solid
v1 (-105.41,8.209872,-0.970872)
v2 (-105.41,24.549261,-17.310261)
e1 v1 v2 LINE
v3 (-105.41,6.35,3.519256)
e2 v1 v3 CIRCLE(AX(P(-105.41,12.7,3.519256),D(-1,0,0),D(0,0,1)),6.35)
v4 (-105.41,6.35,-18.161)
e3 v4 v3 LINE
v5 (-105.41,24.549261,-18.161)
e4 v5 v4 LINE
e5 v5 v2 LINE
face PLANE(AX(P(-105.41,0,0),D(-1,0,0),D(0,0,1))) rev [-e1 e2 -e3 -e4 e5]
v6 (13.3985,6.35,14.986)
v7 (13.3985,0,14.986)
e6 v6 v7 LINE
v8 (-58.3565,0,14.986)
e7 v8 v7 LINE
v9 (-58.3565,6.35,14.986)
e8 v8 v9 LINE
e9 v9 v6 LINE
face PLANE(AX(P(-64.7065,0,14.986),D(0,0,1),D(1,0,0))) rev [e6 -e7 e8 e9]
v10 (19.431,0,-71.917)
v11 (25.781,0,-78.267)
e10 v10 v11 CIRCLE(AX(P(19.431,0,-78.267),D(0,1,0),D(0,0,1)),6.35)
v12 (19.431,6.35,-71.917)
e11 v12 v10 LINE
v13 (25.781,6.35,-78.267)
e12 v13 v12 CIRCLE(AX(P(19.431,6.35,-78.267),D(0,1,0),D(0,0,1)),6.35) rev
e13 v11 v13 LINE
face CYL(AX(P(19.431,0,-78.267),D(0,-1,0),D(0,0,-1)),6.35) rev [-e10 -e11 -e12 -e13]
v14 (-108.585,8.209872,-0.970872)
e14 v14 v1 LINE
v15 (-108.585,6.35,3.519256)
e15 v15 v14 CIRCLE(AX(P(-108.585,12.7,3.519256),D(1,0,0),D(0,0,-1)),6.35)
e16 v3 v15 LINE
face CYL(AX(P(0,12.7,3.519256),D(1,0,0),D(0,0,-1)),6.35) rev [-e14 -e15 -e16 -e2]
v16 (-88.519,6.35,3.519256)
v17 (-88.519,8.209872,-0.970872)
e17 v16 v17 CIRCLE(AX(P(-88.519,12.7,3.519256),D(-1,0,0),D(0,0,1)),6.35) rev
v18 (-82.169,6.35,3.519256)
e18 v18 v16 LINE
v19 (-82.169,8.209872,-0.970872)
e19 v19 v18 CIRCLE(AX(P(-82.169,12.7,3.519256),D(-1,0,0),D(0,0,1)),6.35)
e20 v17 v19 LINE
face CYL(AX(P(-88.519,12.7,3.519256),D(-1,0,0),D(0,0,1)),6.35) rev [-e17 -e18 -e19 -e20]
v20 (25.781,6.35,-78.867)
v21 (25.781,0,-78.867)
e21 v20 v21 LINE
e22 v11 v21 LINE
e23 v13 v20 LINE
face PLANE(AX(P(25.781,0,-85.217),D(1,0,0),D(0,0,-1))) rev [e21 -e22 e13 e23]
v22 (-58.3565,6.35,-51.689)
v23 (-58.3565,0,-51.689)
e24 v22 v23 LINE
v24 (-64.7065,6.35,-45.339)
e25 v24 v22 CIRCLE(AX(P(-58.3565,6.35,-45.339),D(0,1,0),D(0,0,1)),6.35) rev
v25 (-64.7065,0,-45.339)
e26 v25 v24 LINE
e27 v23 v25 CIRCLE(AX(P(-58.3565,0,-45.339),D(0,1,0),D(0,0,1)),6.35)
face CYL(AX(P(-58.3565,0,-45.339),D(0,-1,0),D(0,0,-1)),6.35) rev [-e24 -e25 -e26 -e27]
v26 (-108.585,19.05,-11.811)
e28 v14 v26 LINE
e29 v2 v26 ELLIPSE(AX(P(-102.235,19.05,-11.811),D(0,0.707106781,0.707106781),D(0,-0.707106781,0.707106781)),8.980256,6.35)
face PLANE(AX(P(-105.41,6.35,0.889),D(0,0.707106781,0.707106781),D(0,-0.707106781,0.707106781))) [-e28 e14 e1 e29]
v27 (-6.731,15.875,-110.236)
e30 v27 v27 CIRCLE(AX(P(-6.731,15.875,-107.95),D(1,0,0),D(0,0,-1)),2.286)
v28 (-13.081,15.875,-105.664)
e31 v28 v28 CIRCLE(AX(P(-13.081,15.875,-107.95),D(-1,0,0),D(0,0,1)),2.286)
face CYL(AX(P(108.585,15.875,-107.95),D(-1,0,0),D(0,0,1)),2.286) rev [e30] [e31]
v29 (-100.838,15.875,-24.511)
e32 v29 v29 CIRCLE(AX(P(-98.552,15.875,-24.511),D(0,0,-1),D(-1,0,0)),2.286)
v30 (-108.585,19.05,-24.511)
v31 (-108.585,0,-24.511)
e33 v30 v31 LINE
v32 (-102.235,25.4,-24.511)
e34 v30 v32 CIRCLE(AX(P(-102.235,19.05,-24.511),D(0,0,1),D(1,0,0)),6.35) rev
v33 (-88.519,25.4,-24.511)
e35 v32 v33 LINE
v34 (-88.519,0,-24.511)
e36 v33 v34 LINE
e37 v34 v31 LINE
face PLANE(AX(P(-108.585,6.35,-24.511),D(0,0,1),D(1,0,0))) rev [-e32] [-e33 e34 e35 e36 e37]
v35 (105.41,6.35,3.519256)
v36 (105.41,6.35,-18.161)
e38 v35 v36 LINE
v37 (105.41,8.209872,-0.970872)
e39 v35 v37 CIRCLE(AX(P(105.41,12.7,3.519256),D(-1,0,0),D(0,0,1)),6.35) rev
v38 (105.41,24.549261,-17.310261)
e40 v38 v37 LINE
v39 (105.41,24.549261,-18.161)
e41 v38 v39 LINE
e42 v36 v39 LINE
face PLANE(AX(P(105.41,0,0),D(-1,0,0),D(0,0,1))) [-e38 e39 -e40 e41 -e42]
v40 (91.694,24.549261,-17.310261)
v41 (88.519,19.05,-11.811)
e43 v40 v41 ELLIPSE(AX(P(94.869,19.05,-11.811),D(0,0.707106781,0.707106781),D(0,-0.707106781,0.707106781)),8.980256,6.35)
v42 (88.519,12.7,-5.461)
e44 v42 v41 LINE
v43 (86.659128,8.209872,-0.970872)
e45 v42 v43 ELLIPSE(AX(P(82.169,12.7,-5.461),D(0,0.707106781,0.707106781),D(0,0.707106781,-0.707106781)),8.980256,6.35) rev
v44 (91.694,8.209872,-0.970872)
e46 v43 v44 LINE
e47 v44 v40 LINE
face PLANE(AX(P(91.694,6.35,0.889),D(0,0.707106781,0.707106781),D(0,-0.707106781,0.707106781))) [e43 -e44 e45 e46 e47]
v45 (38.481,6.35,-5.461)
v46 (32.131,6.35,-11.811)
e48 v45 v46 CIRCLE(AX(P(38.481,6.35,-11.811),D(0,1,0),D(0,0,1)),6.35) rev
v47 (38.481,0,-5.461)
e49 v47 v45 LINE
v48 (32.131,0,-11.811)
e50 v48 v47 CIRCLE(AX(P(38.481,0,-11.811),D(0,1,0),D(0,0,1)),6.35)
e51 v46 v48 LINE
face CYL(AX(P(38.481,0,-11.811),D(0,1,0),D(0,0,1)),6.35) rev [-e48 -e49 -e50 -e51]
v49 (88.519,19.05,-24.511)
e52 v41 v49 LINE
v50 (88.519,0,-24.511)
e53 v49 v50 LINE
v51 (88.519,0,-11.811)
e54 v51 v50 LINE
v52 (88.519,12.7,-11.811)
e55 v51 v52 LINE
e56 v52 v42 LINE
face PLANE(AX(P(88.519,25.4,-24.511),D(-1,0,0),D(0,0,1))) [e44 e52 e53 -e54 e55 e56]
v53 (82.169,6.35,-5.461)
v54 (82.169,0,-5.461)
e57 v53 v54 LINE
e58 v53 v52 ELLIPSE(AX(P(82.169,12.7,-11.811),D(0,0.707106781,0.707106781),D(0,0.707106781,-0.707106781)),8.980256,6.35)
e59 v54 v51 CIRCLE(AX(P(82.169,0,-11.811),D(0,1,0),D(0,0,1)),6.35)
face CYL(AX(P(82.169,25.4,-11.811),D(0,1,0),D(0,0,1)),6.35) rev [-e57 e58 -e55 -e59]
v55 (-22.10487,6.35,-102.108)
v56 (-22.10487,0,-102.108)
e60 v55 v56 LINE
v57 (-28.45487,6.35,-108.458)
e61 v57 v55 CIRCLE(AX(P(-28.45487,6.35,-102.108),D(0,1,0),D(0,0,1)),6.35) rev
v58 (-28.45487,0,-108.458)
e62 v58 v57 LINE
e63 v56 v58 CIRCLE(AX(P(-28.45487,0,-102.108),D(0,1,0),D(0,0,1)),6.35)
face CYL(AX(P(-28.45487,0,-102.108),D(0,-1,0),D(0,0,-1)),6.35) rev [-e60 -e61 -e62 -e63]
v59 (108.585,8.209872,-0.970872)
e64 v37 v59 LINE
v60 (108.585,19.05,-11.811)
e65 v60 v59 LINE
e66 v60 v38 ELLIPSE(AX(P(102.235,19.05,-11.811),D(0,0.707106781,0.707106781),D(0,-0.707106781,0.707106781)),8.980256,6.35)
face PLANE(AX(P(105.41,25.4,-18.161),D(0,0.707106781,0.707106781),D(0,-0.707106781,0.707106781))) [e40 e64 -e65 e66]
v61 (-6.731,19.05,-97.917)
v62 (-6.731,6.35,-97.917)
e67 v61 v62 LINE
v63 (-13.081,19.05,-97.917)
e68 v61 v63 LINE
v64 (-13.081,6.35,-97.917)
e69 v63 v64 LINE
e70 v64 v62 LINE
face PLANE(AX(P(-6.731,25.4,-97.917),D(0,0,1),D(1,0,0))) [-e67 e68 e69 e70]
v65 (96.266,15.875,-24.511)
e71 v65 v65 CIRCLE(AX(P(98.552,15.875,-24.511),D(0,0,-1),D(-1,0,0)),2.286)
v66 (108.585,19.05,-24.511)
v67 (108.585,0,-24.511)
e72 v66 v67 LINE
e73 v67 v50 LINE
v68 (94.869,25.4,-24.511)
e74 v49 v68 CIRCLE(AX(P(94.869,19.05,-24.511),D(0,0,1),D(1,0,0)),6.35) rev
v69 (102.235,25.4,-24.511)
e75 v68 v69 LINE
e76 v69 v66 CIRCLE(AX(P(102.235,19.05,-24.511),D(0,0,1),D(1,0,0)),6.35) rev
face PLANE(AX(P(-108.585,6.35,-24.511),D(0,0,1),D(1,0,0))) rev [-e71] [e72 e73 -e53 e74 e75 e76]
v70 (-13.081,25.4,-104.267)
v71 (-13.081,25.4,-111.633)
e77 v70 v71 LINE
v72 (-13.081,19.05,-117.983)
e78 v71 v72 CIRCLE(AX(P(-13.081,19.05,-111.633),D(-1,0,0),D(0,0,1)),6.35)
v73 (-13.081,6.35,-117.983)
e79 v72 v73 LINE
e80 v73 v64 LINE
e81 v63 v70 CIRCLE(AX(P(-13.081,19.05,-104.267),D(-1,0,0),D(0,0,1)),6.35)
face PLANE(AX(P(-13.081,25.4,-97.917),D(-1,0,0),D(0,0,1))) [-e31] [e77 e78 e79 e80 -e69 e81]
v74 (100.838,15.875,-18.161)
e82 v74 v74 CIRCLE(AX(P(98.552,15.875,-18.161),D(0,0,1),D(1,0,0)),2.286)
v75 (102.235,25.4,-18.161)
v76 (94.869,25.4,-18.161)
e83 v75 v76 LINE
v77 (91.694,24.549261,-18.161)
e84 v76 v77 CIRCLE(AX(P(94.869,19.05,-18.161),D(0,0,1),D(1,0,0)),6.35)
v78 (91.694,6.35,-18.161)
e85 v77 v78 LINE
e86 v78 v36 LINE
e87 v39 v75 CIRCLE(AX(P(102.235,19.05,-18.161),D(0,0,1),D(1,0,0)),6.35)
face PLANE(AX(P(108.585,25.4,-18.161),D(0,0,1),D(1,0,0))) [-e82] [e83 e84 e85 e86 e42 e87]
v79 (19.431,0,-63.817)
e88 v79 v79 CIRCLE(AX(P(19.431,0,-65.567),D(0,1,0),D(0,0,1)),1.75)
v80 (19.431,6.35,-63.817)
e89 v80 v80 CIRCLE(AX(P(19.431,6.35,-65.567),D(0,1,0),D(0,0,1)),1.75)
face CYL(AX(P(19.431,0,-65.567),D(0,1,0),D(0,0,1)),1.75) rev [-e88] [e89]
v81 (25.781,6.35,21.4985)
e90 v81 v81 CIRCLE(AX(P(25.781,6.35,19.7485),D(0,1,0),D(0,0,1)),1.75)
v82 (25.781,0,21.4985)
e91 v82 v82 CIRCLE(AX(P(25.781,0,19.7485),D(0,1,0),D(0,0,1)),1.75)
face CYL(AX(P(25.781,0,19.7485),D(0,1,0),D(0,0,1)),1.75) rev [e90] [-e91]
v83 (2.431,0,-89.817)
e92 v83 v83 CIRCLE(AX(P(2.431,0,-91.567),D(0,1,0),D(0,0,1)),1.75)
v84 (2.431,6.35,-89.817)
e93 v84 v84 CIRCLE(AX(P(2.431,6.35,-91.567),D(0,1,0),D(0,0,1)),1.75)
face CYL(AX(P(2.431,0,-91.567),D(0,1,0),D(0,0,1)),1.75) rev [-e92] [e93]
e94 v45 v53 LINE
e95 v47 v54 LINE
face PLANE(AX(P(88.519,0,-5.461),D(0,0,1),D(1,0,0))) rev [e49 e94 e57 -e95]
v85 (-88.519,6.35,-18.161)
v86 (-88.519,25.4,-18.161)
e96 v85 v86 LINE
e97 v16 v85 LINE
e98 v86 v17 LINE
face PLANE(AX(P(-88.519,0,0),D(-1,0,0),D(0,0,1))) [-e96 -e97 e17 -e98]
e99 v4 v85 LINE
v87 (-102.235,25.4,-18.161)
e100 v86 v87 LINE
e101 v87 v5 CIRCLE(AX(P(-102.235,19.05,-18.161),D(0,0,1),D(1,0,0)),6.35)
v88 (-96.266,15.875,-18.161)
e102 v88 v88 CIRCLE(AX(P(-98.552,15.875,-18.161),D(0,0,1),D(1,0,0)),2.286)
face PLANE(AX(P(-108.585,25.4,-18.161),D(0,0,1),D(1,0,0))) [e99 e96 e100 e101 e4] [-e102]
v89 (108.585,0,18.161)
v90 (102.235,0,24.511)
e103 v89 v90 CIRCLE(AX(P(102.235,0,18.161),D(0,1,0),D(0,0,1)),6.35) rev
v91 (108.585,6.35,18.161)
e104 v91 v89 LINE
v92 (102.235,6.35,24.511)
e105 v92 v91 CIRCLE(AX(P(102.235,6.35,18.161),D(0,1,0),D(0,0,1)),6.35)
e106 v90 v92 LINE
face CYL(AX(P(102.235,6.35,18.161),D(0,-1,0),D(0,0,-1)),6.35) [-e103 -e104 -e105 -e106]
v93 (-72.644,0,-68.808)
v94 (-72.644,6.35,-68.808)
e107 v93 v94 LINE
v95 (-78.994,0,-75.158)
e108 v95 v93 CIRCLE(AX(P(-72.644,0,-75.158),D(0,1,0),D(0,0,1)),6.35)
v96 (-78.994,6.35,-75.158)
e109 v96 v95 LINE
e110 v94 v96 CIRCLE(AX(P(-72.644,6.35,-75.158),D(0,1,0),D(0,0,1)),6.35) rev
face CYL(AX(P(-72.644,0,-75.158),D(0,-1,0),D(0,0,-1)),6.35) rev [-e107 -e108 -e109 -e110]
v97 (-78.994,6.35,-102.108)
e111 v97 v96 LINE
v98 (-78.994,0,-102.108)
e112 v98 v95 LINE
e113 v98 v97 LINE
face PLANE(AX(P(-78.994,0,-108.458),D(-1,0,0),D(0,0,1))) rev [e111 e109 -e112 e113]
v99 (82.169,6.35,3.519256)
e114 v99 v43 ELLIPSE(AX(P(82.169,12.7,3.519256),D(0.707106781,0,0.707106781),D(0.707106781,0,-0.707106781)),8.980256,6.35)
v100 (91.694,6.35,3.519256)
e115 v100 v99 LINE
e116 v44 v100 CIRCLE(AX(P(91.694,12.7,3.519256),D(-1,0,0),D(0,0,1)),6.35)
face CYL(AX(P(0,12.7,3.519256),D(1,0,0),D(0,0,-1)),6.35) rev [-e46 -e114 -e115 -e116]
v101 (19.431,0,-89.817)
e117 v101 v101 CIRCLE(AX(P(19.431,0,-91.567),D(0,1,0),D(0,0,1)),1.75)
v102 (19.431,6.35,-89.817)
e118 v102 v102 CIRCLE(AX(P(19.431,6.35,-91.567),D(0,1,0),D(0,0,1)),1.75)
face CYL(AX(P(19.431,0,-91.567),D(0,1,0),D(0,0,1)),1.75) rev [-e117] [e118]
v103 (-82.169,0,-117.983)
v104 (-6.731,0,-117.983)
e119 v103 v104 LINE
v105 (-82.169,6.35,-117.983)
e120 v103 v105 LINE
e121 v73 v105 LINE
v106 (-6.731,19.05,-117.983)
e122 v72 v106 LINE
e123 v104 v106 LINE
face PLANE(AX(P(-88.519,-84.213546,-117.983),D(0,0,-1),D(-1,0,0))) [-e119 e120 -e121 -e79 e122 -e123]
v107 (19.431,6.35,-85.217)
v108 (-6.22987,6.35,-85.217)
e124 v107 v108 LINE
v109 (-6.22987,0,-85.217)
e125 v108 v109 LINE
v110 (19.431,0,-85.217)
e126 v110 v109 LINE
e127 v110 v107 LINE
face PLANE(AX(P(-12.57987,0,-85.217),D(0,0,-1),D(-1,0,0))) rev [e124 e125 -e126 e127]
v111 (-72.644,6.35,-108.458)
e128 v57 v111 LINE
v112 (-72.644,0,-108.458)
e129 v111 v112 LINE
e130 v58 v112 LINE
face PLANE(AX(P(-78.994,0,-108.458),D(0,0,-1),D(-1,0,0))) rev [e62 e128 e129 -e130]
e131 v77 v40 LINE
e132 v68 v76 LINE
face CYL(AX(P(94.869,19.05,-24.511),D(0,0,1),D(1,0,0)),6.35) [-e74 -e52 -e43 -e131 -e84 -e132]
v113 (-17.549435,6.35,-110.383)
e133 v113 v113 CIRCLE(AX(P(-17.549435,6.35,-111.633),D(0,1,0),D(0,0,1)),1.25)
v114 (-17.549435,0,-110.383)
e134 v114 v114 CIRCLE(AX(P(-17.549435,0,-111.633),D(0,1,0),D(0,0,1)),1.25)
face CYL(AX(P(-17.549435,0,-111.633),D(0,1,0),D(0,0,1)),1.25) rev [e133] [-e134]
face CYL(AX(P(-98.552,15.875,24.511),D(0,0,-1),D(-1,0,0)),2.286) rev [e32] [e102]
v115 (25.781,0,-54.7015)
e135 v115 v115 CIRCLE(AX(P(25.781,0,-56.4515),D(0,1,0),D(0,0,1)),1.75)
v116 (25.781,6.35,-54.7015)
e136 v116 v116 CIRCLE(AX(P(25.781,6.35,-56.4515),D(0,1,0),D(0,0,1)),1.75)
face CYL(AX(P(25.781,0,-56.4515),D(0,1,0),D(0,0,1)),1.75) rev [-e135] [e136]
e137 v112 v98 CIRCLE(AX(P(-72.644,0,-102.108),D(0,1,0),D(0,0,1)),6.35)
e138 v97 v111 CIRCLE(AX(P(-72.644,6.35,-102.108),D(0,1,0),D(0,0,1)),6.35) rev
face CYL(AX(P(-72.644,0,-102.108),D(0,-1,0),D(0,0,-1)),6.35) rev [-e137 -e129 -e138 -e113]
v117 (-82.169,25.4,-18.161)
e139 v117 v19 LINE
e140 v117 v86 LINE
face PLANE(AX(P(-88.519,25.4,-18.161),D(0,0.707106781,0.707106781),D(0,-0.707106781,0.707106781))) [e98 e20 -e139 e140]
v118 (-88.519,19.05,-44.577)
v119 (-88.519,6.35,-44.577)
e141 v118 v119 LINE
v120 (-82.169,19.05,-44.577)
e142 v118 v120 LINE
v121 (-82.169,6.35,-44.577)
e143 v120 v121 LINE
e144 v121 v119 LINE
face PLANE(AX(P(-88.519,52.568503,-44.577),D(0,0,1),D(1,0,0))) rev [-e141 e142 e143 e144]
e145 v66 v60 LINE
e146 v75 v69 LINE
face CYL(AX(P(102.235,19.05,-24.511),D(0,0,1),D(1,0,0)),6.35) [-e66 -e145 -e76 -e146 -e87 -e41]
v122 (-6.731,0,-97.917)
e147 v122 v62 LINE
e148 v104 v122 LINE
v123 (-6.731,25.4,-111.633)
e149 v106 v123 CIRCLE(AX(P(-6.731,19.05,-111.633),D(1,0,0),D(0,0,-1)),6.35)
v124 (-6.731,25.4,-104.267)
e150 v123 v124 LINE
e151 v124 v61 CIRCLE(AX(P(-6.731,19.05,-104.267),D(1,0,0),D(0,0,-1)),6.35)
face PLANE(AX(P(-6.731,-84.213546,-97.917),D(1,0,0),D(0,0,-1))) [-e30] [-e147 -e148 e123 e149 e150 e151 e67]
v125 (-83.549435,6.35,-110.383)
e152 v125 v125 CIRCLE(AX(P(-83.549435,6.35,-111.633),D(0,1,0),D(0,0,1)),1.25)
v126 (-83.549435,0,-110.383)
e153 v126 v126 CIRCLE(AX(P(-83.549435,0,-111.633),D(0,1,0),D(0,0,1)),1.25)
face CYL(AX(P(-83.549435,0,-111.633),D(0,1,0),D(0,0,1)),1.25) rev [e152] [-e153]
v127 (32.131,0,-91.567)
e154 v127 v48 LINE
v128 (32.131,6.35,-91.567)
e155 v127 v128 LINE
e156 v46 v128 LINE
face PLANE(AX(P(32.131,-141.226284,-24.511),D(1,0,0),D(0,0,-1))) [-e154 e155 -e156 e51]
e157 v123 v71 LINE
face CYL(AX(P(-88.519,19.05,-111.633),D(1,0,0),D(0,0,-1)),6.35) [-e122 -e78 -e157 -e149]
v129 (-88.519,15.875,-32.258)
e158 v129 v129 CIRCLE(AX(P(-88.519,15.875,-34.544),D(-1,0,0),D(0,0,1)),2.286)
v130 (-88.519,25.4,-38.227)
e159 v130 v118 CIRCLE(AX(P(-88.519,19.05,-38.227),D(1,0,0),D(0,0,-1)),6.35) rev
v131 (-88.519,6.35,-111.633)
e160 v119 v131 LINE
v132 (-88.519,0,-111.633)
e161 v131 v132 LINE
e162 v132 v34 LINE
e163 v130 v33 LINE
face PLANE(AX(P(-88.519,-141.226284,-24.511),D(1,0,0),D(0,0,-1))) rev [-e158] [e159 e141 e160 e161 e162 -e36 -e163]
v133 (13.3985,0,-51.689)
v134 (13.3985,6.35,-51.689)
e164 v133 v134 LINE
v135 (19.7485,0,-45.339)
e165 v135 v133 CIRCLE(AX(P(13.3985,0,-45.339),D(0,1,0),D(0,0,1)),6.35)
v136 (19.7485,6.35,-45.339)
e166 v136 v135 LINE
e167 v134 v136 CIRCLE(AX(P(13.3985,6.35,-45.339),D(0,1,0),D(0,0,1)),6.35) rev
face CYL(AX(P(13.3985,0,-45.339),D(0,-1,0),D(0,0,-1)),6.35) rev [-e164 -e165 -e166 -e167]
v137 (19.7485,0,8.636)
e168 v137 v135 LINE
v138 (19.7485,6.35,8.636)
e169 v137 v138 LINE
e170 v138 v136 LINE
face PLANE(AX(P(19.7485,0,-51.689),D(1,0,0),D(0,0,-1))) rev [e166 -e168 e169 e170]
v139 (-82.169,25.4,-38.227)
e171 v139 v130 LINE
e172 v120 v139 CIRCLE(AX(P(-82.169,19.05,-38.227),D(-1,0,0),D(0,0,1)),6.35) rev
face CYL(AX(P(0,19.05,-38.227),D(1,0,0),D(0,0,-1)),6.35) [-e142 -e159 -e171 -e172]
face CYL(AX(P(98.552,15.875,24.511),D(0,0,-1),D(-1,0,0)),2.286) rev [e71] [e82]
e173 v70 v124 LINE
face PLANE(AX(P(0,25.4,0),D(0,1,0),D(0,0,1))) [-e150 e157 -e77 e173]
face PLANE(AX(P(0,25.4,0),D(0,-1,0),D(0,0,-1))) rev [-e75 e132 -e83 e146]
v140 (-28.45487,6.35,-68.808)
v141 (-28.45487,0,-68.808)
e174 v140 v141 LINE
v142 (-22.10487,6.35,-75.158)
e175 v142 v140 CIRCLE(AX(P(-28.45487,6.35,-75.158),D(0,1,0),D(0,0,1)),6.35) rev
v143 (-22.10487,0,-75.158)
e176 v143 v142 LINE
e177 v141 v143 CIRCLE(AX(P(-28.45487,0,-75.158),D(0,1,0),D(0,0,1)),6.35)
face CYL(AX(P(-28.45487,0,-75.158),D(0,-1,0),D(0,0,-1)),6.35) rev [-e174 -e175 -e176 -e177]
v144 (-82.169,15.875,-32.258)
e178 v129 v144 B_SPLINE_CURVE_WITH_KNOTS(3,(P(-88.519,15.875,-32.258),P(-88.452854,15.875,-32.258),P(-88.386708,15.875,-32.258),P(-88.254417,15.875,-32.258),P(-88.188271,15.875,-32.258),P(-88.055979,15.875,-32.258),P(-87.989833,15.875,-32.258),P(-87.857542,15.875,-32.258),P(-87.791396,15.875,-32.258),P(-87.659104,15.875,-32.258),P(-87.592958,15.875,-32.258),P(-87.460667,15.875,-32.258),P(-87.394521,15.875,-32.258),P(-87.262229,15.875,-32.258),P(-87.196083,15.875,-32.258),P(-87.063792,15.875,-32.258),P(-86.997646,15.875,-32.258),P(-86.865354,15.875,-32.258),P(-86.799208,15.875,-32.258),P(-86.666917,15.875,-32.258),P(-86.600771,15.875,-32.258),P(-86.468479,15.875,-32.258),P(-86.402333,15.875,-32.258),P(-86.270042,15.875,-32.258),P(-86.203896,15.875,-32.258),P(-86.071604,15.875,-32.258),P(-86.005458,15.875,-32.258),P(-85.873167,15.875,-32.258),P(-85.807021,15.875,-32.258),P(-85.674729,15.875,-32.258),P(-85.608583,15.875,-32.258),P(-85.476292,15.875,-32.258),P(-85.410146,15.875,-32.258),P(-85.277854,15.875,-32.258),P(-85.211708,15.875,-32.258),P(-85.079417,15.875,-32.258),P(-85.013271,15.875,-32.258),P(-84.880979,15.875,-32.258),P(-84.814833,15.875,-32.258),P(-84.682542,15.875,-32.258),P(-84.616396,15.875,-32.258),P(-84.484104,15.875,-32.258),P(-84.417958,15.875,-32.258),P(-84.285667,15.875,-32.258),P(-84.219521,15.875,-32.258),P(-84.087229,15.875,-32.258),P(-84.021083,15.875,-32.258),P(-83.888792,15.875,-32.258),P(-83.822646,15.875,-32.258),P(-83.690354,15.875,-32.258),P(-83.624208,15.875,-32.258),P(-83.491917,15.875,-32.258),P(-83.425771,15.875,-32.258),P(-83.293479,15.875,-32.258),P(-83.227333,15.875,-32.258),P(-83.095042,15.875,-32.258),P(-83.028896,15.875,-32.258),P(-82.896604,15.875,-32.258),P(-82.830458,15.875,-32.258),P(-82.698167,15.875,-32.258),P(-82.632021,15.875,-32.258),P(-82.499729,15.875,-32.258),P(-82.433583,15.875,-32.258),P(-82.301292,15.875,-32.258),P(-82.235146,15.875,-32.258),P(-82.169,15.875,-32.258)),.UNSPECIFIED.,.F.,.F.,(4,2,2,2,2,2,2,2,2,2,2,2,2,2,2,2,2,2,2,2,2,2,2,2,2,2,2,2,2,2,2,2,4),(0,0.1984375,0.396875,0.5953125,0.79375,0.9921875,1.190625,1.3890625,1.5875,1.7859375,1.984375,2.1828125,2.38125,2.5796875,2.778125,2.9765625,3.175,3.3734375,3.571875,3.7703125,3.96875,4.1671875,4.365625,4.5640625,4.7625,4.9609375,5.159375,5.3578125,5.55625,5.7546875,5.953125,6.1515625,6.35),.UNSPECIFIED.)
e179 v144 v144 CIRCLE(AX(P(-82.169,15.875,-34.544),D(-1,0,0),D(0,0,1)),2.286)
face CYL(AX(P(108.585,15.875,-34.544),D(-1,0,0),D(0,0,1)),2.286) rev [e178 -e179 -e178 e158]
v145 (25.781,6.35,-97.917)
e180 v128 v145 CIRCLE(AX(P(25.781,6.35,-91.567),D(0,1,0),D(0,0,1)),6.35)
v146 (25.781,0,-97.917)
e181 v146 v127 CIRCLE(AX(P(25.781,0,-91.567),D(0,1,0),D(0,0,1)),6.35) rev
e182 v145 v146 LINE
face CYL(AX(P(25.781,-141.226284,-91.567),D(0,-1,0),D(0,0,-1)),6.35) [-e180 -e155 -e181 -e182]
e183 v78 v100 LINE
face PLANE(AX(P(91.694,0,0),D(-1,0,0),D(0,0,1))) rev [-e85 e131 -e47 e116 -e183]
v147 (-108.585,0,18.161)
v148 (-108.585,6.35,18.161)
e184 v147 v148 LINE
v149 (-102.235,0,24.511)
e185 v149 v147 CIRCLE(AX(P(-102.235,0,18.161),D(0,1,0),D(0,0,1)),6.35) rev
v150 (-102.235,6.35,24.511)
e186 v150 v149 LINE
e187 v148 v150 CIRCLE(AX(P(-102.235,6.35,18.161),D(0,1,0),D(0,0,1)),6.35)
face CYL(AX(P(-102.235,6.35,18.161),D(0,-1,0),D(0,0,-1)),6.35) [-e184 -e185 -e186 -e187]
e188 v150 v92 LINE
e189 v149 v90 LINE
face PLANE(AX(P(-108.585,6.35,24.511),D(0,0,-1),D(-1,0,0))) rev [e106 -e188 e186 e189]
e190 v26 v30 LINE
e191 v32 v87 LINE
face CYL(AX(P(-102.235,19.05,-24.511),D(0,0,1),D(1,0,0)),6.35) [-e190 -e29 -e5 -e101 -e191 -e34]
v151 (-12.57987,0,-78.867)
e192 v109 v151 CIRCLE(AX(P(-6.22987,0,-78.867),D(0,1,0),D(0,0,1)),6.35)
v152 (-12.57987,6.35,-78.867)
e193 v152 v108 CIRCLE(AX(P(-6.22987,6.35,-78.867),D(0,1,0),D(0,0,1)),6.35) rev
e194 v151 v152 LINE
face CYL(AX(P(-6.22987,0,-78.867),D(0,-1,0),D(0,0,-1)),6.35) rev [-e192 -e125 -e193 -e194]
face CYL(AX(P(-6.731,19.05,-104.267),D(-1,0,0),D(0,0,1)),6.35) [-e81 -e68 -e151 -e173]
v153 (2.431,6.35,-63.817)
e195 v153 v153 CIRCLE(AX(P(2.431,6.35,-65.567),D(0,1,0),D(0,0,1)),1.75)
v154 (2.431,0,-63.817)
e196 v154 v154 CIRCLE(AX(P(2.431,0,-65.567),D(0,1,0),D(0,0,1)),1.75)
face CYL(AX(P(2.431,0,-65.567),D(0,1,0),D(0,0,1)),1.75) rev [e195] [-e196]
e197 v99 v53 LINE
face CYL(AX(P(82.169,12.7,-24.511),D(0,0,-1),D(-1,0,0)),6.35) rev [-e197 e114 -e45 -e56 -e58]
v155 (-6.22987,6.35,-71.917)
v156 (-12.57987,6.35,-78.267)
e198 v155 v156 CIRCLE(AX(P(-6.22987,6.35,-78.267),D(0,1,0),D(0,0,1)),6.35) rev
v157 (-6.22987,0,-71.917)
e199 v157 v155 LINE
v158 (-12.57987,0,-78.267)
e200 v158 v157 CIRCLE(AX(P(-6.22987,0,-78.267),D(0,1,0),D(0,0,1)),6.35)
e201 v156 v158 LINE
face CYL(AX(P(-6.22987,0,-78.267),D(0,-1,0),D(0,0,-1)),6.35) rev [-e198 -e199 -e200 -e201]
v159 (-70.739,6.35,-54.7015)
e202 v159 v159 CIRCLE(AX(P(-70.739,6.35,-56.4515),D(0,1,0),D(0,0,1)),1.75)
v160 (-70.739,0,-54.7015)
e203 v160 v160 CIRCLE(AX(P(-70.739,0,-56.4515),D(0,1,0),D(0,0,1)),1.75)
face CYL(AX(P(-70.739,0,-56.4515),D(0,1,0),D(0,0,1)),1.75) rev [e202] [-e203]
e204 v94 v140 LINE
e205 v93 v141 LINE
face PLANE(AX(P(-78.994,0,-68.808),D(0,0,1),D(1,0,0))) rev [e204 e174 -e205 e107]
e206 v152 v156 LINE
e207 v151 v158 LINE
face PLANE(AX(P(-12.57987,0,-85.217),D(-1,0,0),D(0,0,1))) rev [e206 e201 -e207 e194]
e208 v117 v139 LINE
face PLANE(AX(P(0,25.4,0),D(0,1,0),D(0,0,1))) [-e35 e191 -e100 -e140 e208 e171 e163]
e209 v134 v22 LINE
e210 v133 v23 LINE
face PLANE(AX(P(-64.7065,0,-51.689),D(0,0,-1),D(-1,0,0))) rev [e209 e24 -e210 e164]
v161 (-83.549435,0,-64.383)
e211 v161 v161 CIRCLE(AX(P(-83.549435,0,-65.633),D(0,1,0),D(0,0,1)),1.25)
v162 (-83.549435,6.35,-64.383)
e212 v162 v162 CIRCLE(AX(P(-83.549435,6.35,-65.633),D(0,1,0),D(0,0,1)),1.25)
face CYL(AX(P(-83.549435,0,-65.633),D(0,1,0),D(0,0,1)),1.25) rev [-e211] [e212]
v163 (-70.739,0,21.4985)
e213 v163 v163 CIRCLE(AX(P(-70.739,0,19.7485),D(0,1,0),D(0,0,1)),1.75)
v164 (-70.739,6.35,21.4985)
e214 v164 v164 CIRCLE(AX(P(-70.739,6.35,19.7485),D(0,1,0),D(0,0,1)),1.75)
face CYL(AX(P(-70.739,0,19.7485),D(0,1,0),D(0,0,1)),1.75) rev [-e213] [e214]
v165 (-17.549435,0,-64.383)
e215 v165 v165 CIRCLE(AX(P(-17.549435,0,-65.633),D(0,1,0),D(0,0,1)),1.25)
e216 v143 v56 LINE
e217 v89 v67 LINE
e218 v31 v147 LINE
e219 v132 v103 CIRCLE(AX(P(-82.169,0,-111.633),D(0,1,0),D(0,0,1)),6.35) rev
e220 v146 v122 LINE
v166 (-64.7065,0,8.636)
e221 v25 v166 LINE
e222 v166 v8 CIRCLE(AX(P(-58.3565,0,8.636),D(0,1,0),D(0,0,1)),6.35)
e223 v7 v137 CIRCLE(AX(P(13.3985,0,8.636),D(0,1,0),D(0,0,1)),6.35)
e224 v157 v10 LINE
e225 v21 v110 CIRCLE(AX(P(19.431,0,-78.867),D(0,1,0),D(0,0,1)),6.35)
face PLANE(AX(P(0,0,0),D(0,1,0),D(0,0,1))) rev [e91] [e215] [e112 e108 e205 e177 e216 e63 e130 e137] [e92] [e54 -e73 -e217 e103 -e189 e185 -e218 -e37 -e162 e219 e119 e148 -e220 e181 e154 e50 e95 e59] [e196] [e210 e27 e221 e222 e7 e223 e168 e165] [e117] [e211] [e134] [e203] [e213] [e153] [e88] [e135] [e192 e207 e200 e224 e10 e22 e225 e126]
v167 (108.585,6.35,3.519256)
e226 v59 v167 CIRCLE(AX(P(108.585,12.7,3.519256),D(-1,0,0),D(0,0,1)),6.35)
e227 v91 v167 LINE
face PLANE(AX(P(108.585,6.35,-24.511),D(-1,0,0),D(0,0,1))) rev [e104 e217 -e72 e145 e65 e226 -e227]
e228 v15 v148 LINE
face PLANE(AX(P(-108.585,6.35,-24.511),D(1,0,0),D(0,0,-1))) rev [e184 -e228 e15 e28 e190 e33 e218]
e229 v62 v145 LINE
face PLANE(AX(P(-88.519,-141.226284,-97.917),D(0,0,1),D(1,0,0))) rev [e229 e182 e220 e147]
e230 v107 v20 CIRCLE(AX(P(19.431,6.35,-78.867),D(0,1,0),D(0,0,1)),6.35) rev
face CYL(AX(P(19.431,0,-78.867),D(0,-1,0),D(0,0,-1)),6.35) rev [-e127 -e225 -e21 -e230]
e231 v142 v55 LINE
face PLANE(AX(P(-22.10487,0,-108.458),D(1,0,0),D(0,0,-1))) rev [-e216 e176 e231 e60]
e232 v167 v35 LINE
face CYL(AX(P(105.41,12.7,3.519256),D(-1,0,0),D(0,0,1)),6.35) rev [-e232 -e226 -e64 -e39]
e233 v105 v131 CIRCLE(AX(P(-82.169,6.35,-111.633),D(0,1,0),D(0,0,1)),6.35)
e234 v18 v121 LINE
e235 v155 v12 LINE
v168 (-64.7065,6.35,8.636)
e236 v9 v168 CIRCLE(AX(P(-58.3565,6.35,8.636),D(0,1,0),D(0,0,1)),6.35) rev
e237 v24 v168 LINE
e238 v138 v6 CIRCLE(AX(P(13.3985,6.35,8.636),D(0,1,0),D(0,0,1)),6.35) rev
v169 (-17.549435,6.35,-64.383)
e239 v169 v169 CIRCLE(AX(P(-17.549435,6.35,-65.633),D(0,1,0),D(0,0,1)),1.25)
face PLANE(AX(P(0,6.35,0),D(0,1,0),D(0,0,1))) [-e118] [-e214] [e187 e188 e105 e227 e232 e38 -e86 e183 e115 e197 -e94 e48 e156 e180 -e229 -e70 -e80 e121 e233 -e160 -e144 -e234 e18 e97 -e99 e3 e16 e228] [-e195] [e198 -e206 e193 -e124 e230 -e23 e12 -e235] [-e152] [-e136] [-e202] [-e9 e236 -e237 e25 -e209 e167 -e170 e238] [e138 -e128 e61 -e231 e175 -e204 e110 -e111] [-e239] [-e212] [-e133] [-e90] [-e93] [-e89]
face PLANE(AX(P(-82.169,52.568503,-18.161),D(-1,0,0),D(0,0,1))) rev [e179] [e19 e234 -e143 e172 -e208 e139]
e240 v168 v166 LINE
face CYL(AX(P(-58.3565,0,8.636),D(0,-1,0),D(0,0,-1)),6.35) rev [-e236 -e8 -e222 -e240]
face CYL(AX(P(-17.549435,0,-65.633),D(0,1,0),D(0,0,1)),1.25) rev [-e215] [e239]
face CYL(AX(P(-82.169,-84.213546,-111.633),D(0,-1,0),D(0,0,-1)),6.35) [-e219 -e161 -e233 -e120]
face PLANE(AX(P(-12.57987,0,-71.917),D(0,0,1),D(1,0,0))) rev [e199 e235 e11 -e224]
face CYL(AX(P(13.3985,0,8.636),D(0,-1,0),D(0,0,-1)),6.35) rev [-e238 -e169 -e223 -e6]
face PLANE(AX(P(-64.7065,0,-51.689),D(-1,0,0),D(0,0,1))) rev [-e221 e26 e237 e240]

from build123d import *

# Parameters (mm, degrees)
SKETCH2_W            = 217.17
SKETCH2_H            = 49.022
BOSS_EXTRUDE1_DEPTH  = 6.35
SKETCH3_W            = 20.066
SKETCH3_H            = 6.35
BOSS_EXTRUDE2_DEPTH  = 25.4
SKETCH5_W            = 120.65
SKETCH5_H            = 73.406
BOSS_EXTRUDE3_DEPTH  = 6.35
SKETCH6_W            = 6.35
SKETCH6_H            = 26.416
BOSS_EXTRUDE4_DEPTH  = 19.05
SKETCH7_R            = 2.286
CUT_EXTRUDE1_DEPTH   = 134.507689146
SKETCH8_R            = 2.286
CUT_EXTRUDE2_DEPTH   = 222.54657683
SKETCH9_W            = 56.388
SKETCH9_H            = 19.05
CUT_EXTRUDE3_DEPTH   = 148.44946122
SKETCH11_W           = 81.788
SKETCH11_H           = 20.066
BOSS_EXTRUDE5_DEPTH  = 6.35
SKETCH12_W           = 6.35
SKETCH12_H           = 20.066
BOSS_EXTRUDE6_DEPTH  = 25.4
SKETCH16_R           = 1.25
SKETCH16_R_2         = 1.75
SKETCH16_W           = 56.889130435
SKETCH16_H           = 39.65
SKETCH16_W_2         = 84.455
SKETCH16_H_2         = 66.675
SKETCH16_W_3         = 38.360869565
SKETCH16_H_3         = 13.3
CUT_EXTRUDE6_DEPTH   = 162.473195961
BOSS_EXTRUDE8_DEPTH  = 3.175
BOSS_EXTRUDE9_DEPTH  = 3.175
BOSS_EXTRUDE10_DEPTH = 3.175
BOSS_EXTRUDE11_DEPTH = 6.35
FILLET1_R            = 6.35
SKETCH21_R           = 2.286
CUT_EXTRUDE7_DEPTH   = 172.370253676
FILLET2_R            = 6.35


# Some blends are built 0.0001 mm under size
with BuildPart() as part:
    # Sketch2 → Boss-Extrude1 (new body)
    with BuildSketch(Plane(origin=(0, 0, 0), x_dir=(1, 0, 0), z_dir=(0, 1, 0))):
        Rectangle(SKETCH2_W, SKETCH2_H)
    extrude(amount=BOSS_EXTRUDE1_DEPTH)

    # Sketch3 → Boss-Extrude2 (add)
    with BuildSketch(Plane.XZ):
        with Locations((98.552, -21.336)):
            Rectangle(SKETCH3_W, SKETCH3_H)
        with Locations((-98.552, -21.336)):
            Rectangle(SKETCH3_W, SKETCH3_H)
    extrude(amount=-BOSS_EXTRUDE2_DEPTH)

    # Sketch5 → Boss-Extrude3 (add)
    with BuildSketch(Plane(origin=(0, 6.35, 0), x_dir=(1, 0, 0), z_dir=(0, 1, 0))):
        with Locations((-28.194, 61.214)):
            Rectangle(SKETCH5_W, SKETCH5_H)
    extrude(amount=-BOSS_EXTRUDE3_DEPTH)

    # Sketch6 → Boss-Extrude4 (add)
    with BuildSketch(Plane(origin=(0, 6.35, 0), x_dir=(1, 0, 0), z_dir=(0, 1, 0))):
        with Locations((-85.344, 31.369)):
            Rectangle(SKETCH6_W, SKETCH6_H)
    extrude(amount=BOSS_EXTRUDE4_DEPTH)

    # Sketch7 → Cut-Extrude1 (cut, through all)
    with BuildSketch(Plane(origin=(0, 0, -24.511), x_dir=(-1, 0, 0), z_dir=(0, 0, -1))):
        with Locations((-98.552, 15.875)):
            Circle(SKETCH7_R)
        with Locations((98.552, 15.875)):
            Circle(SKETCH7_R)
    extrude(amount=-CUT_EXTRUDE1_DEPTH, mode=Mode.SUBTRACT)

    # Sketch8 → Cut-Extrude2 (cut, through all)
    with BuildSketch(Plane.ZY.offset(88.519)):
        with Locations((-34.544, 15.875)):
            Circle(SKETCH8_R)
    extrude(amount=-CUT_EXTRUDE2_DEPTH, mode=Mode.SUBTRACT)

    # Sketch9 → Cut-Extrude3 (cut, through all)
    with BuildSketch(Plane(origin=(0, 6.35, 0), x_dir=(1, 0, 0), z_dir=(0, 1, 0))):
        with Locations((60.325, 14.986)):
            Rectangle(SKETCH9_W, SKETCH9_H)
    extrude(amount=-CUT_EXTRUDE3_DEPTH, mode=Mode.SUBTRACT)

    # Sketch11 → Boss-Extrude5 (add)
    with BuildSketch(Plane(origin=(0, 6.35, 0), x_dir=(1, 0, 0), z_dir=(0, 1, 0))):
        with Locations((-47.625, 107.95)):
            Rectangle(SKETCH11_W, SKETCH11_H)
    extrude(amount=-BOSS_EXTRUDE5_DEPTH)

    # Sketch12 → Boss-Extrude6 (add)
    with BuildSketch(Plane.XZ):
        with Locations((-9.906, -107.95)):
            Rectangle(SKETCH12_W, SKETCH12_H)
    extrude(amount=-BOSS_EXTRUDE6_DEPTH)

    # Sketch16 → Cut-Extrude6 (cut, through all)
    with BuildSketch(Plane(origin=(0, 6.35, 0), x_dir=(1, 0, 0), z_dir=(0, 1, 0))):
        with Locations(Location((-17.549434783, 111.633, 0), (0, 0, 270))):
            Circle(SKETCH16_R)
        with Locations(Location((-17.549434783, 65.633, 0), (0, 0, 270))):
            Circle(SKETCH16_R)
        with Locations(Location((-83.549434783, 65.633, 0), (0, 0, 270))):
            Circle(SKETCH16_R)
        with Locations(Location((-83.549434783, 111.633, 0), (0, 0, 270))):
            Circle(SKETCH16_R)
        with Locations(Location((-70.739, 56.4515, 0), (0, 0, 270))):
            Circle(SKETCH16_R_2)
        with Locations(Location((-70.739, -19.7485, 0), (0, 0, 270))):
            Circle(SKETCH16_R_2)
        with Locations(Location((25.781, -19.7485, 0), (0, 0, 270))):
            Circle(SKETCH16_R_2)
        with Locations(Location((25.781, 56.4515, 0), (0, 0, 270))):
            Circle(SKETCH16_R_2)
        with Locations(Location((19.431, 91.567, 0), (0, 0, 270))):
            Circle(SKETCH16_R_2)
        with Locations(Location((19.431, 65.567, 0), (0, 0, 270))):
            Circle(SKETCH16_R_2)
        with Locations(Location((2.431, 65.567, 0), (0, 0, 270))):
            Circle(SKETCH16_R_2)
        with Locations(Location((2.431, 91.567, 0), (0, 0, 270))):
            Circle(SKETCH16_R_2)
        with Locations((-50.549434783, 88.633)):
            Rectangle(SKETCH16_W, SKETCH16_H)
        with Locations((-22.479, 18.3515)):
            Rectangle(SKETCH16_W_2, SKETCH16_H_2)
        with Locations((6.600565218, 78.567)):
            Rectangle(SKETCH16_W_3, SKETCH16_H_3)
    extrude(amount=-CUT_EXTRUDE6_DEPTH, mode=Mode.SUBTRACT)

    # Sketch17 → Boss-Extrude8 (add)
    with BuildSketch(Plane.ZY.offset(108.585)):
        Polygon((-18.161, 25.4), (-18.161, 6.35), (0.889, 6.35), align=None)
    extrude(amount=-BOSS_EXTRUDE8_DEPTH)

    # Sketch18 → Boss-Extrude9 (add)
    with BuildSketch(Plane(origin=(108.585, 0, 0), x_dir=(0, 0, -1), z_dir=(1, 0, 0))):
        Polygon((18.161, 25.4), (-0.889, 6.35), (18.161, 6.35), align=None)
    extrude(amount=-BOSS_EXTRUDE9_DEPTH)

    # Sketch19 → Boss-Extrude10 (add)
    with BuildSketch(Plane.ZY.offset(-88.519)):
        Polygon((-18.161, 25.4), (-18.161, 6.35), (0.889, 6.35), align=None)
    extrude(amount=-BOSS_EXTRUDE10_DEPTH)

    # Sketch20 → Boss-Extrude11 (add)
    with BuildSketch(Plane(origin=(-82.169, 0, 0), x_dir=(0, 0, -1), z_dir=(1, 0, 0))):
        Polygon((18.161, 25.4), (-0.889, 6.35), (18.161, 6.35), align=None)
    extrude(amount=-BOSS_EXTRUDE11_DEPTH)

    # Fillet1
    fillet1_edges = [part.edges().sort_by_distance(p)[0] for p in [
        (88.519, 3.175, -5.461),
        (32.131, 3.175, -5.461),
        (-88.519, 3.175, -117.983),
        (-22.104869565, 3.175, -108.458),
        (-22.104869565, 3.175, -68.808),
        (-78.994, 3.175, -68.808),
        (-78.994, 3.175, -108.458),
        (25.781, 3.175, -85.217),
        (25.781, 3.175, -71.917),
        (-12.579869565, 3.175, -71.917),
        (-12.579869565, 3.175, -85.217),
        (19.7485, 3.175, -51.689),
        (19.7485, 3.175, 14.986),
        (-64.7065, 3.175, 14.986),
        (-64.7065, 3.175, -51.689),
        (32.131, 3.175, -97.917),
        (108.585, 3.175, 24.511),
        (-108.585, 3.175, 24.511),
    ]]
    fillet(fillet1_edges, radius=FILLET1_R)

    # Sketch21 → Cut-Extrude7 (cut, through all)
    with BuildSketch(Plane.ZY.offset(13.081)):
        with Locations((-107.95, 15.875)):
            Circle(SKETCH21_R)
    extrude(amount=-CUT_EXTRUDE7_DEPTH, mode=Mode.SUBTRACT)

    # Fillet2
    fillet2_edges = [part.edges().sort_by_distance(p)[0] for p in [
        (88.519, 6.35, -5.461),
        (106.9975, 6.35, 0.889),
        (90.1065, 6.35, 0.889),
        (-85.344, 6.35, 0.889),
        (-106.9975, 6.35, 0.889),
    ]]
    fillet(fillet2_edges, radius=FILLET2_R - 0.0001)  # a hair under: the kernel refuses the full size
    # the kernel refuses this fillet: 6.35 mm, written as the material it takes off along each edge
    with BuildSketch(Plane(origin=(108.585, 25.4, -2.286), x_dir=(0, -1, 0), z_dir=(0, 0, -1)), Plane(origin=(-66.294, 25.4, -44.577), x_dir=(0, -1, 0), z_dir=(-1, 0, 0))) as fillet2_2_piece_1:
        with BuildLine():
            CenterArc((FILLET2_R, FILLET2_R), FILLET2_R, 180, 90)
            Line((0, FILLET2_R), (-FILLET2_R * 0.02, FILLET2_R))
            Line((-FILLET2_R * 0.02, FILLET2_R), (-FILLET2_R * 0.02, -FILLET2_R * 0.02))
            Line((-FILLET2_R * 0.02, -FILLET2_R * 0.02), (FILLET2_R, -FILLET2_R * 0.02))
            Line((FILLET2_R, -FILLET2_R * 0.02), (FILLET2_R, 0))
        make_face()
    extrude(amount=38.1, mode=Mode.SUBTRACT)
    with BuildSketch(Plane(origin=(88.519, 25.4, -40.386), x_dir=(1, 0, 0), z_dir=(0, 0, 1)), Plane(origin=(-28.956, 25.4, -117.983), x_dir=(0, -1, 0), z_dir=(1, 0, 0)), Plane(origin=(-108.585, 25.4, -2.286), x_dir=(0, -1, 0), z_dir=(0, 0, -1)), Plane(origin=(9.144, 25.4, -97.917), x_dir=(0, -1, 0), z_dir=(-1, 0, 0))) as fillet2_2_piece_2:
        with BuildLine():
            CenterArc((FILLET2_R, -FILLET2_R), FILLET2_R, 90, 90)
            Line((0, -FILLET2_R), (-FILLET2_R * 0.02, -FILLET2_R))
            Line((-FILLET2_R * 0.02, -FILLET2_R), (-FILLET2_R * 0.02, FILLET2_R * 0.02))
            Line((-FILLET2_R * 0.02, FILLET2_R * 0.02), (FILLET2_R, FILLET2_R * 0.02))
            Line((FILLET2_R, FILLET2_R * 0.02), (FILLET2_R, 0))
        make_face()
    extrude(amount=38.1, mode=Mode.SUBTRACT)


solid = part.part
